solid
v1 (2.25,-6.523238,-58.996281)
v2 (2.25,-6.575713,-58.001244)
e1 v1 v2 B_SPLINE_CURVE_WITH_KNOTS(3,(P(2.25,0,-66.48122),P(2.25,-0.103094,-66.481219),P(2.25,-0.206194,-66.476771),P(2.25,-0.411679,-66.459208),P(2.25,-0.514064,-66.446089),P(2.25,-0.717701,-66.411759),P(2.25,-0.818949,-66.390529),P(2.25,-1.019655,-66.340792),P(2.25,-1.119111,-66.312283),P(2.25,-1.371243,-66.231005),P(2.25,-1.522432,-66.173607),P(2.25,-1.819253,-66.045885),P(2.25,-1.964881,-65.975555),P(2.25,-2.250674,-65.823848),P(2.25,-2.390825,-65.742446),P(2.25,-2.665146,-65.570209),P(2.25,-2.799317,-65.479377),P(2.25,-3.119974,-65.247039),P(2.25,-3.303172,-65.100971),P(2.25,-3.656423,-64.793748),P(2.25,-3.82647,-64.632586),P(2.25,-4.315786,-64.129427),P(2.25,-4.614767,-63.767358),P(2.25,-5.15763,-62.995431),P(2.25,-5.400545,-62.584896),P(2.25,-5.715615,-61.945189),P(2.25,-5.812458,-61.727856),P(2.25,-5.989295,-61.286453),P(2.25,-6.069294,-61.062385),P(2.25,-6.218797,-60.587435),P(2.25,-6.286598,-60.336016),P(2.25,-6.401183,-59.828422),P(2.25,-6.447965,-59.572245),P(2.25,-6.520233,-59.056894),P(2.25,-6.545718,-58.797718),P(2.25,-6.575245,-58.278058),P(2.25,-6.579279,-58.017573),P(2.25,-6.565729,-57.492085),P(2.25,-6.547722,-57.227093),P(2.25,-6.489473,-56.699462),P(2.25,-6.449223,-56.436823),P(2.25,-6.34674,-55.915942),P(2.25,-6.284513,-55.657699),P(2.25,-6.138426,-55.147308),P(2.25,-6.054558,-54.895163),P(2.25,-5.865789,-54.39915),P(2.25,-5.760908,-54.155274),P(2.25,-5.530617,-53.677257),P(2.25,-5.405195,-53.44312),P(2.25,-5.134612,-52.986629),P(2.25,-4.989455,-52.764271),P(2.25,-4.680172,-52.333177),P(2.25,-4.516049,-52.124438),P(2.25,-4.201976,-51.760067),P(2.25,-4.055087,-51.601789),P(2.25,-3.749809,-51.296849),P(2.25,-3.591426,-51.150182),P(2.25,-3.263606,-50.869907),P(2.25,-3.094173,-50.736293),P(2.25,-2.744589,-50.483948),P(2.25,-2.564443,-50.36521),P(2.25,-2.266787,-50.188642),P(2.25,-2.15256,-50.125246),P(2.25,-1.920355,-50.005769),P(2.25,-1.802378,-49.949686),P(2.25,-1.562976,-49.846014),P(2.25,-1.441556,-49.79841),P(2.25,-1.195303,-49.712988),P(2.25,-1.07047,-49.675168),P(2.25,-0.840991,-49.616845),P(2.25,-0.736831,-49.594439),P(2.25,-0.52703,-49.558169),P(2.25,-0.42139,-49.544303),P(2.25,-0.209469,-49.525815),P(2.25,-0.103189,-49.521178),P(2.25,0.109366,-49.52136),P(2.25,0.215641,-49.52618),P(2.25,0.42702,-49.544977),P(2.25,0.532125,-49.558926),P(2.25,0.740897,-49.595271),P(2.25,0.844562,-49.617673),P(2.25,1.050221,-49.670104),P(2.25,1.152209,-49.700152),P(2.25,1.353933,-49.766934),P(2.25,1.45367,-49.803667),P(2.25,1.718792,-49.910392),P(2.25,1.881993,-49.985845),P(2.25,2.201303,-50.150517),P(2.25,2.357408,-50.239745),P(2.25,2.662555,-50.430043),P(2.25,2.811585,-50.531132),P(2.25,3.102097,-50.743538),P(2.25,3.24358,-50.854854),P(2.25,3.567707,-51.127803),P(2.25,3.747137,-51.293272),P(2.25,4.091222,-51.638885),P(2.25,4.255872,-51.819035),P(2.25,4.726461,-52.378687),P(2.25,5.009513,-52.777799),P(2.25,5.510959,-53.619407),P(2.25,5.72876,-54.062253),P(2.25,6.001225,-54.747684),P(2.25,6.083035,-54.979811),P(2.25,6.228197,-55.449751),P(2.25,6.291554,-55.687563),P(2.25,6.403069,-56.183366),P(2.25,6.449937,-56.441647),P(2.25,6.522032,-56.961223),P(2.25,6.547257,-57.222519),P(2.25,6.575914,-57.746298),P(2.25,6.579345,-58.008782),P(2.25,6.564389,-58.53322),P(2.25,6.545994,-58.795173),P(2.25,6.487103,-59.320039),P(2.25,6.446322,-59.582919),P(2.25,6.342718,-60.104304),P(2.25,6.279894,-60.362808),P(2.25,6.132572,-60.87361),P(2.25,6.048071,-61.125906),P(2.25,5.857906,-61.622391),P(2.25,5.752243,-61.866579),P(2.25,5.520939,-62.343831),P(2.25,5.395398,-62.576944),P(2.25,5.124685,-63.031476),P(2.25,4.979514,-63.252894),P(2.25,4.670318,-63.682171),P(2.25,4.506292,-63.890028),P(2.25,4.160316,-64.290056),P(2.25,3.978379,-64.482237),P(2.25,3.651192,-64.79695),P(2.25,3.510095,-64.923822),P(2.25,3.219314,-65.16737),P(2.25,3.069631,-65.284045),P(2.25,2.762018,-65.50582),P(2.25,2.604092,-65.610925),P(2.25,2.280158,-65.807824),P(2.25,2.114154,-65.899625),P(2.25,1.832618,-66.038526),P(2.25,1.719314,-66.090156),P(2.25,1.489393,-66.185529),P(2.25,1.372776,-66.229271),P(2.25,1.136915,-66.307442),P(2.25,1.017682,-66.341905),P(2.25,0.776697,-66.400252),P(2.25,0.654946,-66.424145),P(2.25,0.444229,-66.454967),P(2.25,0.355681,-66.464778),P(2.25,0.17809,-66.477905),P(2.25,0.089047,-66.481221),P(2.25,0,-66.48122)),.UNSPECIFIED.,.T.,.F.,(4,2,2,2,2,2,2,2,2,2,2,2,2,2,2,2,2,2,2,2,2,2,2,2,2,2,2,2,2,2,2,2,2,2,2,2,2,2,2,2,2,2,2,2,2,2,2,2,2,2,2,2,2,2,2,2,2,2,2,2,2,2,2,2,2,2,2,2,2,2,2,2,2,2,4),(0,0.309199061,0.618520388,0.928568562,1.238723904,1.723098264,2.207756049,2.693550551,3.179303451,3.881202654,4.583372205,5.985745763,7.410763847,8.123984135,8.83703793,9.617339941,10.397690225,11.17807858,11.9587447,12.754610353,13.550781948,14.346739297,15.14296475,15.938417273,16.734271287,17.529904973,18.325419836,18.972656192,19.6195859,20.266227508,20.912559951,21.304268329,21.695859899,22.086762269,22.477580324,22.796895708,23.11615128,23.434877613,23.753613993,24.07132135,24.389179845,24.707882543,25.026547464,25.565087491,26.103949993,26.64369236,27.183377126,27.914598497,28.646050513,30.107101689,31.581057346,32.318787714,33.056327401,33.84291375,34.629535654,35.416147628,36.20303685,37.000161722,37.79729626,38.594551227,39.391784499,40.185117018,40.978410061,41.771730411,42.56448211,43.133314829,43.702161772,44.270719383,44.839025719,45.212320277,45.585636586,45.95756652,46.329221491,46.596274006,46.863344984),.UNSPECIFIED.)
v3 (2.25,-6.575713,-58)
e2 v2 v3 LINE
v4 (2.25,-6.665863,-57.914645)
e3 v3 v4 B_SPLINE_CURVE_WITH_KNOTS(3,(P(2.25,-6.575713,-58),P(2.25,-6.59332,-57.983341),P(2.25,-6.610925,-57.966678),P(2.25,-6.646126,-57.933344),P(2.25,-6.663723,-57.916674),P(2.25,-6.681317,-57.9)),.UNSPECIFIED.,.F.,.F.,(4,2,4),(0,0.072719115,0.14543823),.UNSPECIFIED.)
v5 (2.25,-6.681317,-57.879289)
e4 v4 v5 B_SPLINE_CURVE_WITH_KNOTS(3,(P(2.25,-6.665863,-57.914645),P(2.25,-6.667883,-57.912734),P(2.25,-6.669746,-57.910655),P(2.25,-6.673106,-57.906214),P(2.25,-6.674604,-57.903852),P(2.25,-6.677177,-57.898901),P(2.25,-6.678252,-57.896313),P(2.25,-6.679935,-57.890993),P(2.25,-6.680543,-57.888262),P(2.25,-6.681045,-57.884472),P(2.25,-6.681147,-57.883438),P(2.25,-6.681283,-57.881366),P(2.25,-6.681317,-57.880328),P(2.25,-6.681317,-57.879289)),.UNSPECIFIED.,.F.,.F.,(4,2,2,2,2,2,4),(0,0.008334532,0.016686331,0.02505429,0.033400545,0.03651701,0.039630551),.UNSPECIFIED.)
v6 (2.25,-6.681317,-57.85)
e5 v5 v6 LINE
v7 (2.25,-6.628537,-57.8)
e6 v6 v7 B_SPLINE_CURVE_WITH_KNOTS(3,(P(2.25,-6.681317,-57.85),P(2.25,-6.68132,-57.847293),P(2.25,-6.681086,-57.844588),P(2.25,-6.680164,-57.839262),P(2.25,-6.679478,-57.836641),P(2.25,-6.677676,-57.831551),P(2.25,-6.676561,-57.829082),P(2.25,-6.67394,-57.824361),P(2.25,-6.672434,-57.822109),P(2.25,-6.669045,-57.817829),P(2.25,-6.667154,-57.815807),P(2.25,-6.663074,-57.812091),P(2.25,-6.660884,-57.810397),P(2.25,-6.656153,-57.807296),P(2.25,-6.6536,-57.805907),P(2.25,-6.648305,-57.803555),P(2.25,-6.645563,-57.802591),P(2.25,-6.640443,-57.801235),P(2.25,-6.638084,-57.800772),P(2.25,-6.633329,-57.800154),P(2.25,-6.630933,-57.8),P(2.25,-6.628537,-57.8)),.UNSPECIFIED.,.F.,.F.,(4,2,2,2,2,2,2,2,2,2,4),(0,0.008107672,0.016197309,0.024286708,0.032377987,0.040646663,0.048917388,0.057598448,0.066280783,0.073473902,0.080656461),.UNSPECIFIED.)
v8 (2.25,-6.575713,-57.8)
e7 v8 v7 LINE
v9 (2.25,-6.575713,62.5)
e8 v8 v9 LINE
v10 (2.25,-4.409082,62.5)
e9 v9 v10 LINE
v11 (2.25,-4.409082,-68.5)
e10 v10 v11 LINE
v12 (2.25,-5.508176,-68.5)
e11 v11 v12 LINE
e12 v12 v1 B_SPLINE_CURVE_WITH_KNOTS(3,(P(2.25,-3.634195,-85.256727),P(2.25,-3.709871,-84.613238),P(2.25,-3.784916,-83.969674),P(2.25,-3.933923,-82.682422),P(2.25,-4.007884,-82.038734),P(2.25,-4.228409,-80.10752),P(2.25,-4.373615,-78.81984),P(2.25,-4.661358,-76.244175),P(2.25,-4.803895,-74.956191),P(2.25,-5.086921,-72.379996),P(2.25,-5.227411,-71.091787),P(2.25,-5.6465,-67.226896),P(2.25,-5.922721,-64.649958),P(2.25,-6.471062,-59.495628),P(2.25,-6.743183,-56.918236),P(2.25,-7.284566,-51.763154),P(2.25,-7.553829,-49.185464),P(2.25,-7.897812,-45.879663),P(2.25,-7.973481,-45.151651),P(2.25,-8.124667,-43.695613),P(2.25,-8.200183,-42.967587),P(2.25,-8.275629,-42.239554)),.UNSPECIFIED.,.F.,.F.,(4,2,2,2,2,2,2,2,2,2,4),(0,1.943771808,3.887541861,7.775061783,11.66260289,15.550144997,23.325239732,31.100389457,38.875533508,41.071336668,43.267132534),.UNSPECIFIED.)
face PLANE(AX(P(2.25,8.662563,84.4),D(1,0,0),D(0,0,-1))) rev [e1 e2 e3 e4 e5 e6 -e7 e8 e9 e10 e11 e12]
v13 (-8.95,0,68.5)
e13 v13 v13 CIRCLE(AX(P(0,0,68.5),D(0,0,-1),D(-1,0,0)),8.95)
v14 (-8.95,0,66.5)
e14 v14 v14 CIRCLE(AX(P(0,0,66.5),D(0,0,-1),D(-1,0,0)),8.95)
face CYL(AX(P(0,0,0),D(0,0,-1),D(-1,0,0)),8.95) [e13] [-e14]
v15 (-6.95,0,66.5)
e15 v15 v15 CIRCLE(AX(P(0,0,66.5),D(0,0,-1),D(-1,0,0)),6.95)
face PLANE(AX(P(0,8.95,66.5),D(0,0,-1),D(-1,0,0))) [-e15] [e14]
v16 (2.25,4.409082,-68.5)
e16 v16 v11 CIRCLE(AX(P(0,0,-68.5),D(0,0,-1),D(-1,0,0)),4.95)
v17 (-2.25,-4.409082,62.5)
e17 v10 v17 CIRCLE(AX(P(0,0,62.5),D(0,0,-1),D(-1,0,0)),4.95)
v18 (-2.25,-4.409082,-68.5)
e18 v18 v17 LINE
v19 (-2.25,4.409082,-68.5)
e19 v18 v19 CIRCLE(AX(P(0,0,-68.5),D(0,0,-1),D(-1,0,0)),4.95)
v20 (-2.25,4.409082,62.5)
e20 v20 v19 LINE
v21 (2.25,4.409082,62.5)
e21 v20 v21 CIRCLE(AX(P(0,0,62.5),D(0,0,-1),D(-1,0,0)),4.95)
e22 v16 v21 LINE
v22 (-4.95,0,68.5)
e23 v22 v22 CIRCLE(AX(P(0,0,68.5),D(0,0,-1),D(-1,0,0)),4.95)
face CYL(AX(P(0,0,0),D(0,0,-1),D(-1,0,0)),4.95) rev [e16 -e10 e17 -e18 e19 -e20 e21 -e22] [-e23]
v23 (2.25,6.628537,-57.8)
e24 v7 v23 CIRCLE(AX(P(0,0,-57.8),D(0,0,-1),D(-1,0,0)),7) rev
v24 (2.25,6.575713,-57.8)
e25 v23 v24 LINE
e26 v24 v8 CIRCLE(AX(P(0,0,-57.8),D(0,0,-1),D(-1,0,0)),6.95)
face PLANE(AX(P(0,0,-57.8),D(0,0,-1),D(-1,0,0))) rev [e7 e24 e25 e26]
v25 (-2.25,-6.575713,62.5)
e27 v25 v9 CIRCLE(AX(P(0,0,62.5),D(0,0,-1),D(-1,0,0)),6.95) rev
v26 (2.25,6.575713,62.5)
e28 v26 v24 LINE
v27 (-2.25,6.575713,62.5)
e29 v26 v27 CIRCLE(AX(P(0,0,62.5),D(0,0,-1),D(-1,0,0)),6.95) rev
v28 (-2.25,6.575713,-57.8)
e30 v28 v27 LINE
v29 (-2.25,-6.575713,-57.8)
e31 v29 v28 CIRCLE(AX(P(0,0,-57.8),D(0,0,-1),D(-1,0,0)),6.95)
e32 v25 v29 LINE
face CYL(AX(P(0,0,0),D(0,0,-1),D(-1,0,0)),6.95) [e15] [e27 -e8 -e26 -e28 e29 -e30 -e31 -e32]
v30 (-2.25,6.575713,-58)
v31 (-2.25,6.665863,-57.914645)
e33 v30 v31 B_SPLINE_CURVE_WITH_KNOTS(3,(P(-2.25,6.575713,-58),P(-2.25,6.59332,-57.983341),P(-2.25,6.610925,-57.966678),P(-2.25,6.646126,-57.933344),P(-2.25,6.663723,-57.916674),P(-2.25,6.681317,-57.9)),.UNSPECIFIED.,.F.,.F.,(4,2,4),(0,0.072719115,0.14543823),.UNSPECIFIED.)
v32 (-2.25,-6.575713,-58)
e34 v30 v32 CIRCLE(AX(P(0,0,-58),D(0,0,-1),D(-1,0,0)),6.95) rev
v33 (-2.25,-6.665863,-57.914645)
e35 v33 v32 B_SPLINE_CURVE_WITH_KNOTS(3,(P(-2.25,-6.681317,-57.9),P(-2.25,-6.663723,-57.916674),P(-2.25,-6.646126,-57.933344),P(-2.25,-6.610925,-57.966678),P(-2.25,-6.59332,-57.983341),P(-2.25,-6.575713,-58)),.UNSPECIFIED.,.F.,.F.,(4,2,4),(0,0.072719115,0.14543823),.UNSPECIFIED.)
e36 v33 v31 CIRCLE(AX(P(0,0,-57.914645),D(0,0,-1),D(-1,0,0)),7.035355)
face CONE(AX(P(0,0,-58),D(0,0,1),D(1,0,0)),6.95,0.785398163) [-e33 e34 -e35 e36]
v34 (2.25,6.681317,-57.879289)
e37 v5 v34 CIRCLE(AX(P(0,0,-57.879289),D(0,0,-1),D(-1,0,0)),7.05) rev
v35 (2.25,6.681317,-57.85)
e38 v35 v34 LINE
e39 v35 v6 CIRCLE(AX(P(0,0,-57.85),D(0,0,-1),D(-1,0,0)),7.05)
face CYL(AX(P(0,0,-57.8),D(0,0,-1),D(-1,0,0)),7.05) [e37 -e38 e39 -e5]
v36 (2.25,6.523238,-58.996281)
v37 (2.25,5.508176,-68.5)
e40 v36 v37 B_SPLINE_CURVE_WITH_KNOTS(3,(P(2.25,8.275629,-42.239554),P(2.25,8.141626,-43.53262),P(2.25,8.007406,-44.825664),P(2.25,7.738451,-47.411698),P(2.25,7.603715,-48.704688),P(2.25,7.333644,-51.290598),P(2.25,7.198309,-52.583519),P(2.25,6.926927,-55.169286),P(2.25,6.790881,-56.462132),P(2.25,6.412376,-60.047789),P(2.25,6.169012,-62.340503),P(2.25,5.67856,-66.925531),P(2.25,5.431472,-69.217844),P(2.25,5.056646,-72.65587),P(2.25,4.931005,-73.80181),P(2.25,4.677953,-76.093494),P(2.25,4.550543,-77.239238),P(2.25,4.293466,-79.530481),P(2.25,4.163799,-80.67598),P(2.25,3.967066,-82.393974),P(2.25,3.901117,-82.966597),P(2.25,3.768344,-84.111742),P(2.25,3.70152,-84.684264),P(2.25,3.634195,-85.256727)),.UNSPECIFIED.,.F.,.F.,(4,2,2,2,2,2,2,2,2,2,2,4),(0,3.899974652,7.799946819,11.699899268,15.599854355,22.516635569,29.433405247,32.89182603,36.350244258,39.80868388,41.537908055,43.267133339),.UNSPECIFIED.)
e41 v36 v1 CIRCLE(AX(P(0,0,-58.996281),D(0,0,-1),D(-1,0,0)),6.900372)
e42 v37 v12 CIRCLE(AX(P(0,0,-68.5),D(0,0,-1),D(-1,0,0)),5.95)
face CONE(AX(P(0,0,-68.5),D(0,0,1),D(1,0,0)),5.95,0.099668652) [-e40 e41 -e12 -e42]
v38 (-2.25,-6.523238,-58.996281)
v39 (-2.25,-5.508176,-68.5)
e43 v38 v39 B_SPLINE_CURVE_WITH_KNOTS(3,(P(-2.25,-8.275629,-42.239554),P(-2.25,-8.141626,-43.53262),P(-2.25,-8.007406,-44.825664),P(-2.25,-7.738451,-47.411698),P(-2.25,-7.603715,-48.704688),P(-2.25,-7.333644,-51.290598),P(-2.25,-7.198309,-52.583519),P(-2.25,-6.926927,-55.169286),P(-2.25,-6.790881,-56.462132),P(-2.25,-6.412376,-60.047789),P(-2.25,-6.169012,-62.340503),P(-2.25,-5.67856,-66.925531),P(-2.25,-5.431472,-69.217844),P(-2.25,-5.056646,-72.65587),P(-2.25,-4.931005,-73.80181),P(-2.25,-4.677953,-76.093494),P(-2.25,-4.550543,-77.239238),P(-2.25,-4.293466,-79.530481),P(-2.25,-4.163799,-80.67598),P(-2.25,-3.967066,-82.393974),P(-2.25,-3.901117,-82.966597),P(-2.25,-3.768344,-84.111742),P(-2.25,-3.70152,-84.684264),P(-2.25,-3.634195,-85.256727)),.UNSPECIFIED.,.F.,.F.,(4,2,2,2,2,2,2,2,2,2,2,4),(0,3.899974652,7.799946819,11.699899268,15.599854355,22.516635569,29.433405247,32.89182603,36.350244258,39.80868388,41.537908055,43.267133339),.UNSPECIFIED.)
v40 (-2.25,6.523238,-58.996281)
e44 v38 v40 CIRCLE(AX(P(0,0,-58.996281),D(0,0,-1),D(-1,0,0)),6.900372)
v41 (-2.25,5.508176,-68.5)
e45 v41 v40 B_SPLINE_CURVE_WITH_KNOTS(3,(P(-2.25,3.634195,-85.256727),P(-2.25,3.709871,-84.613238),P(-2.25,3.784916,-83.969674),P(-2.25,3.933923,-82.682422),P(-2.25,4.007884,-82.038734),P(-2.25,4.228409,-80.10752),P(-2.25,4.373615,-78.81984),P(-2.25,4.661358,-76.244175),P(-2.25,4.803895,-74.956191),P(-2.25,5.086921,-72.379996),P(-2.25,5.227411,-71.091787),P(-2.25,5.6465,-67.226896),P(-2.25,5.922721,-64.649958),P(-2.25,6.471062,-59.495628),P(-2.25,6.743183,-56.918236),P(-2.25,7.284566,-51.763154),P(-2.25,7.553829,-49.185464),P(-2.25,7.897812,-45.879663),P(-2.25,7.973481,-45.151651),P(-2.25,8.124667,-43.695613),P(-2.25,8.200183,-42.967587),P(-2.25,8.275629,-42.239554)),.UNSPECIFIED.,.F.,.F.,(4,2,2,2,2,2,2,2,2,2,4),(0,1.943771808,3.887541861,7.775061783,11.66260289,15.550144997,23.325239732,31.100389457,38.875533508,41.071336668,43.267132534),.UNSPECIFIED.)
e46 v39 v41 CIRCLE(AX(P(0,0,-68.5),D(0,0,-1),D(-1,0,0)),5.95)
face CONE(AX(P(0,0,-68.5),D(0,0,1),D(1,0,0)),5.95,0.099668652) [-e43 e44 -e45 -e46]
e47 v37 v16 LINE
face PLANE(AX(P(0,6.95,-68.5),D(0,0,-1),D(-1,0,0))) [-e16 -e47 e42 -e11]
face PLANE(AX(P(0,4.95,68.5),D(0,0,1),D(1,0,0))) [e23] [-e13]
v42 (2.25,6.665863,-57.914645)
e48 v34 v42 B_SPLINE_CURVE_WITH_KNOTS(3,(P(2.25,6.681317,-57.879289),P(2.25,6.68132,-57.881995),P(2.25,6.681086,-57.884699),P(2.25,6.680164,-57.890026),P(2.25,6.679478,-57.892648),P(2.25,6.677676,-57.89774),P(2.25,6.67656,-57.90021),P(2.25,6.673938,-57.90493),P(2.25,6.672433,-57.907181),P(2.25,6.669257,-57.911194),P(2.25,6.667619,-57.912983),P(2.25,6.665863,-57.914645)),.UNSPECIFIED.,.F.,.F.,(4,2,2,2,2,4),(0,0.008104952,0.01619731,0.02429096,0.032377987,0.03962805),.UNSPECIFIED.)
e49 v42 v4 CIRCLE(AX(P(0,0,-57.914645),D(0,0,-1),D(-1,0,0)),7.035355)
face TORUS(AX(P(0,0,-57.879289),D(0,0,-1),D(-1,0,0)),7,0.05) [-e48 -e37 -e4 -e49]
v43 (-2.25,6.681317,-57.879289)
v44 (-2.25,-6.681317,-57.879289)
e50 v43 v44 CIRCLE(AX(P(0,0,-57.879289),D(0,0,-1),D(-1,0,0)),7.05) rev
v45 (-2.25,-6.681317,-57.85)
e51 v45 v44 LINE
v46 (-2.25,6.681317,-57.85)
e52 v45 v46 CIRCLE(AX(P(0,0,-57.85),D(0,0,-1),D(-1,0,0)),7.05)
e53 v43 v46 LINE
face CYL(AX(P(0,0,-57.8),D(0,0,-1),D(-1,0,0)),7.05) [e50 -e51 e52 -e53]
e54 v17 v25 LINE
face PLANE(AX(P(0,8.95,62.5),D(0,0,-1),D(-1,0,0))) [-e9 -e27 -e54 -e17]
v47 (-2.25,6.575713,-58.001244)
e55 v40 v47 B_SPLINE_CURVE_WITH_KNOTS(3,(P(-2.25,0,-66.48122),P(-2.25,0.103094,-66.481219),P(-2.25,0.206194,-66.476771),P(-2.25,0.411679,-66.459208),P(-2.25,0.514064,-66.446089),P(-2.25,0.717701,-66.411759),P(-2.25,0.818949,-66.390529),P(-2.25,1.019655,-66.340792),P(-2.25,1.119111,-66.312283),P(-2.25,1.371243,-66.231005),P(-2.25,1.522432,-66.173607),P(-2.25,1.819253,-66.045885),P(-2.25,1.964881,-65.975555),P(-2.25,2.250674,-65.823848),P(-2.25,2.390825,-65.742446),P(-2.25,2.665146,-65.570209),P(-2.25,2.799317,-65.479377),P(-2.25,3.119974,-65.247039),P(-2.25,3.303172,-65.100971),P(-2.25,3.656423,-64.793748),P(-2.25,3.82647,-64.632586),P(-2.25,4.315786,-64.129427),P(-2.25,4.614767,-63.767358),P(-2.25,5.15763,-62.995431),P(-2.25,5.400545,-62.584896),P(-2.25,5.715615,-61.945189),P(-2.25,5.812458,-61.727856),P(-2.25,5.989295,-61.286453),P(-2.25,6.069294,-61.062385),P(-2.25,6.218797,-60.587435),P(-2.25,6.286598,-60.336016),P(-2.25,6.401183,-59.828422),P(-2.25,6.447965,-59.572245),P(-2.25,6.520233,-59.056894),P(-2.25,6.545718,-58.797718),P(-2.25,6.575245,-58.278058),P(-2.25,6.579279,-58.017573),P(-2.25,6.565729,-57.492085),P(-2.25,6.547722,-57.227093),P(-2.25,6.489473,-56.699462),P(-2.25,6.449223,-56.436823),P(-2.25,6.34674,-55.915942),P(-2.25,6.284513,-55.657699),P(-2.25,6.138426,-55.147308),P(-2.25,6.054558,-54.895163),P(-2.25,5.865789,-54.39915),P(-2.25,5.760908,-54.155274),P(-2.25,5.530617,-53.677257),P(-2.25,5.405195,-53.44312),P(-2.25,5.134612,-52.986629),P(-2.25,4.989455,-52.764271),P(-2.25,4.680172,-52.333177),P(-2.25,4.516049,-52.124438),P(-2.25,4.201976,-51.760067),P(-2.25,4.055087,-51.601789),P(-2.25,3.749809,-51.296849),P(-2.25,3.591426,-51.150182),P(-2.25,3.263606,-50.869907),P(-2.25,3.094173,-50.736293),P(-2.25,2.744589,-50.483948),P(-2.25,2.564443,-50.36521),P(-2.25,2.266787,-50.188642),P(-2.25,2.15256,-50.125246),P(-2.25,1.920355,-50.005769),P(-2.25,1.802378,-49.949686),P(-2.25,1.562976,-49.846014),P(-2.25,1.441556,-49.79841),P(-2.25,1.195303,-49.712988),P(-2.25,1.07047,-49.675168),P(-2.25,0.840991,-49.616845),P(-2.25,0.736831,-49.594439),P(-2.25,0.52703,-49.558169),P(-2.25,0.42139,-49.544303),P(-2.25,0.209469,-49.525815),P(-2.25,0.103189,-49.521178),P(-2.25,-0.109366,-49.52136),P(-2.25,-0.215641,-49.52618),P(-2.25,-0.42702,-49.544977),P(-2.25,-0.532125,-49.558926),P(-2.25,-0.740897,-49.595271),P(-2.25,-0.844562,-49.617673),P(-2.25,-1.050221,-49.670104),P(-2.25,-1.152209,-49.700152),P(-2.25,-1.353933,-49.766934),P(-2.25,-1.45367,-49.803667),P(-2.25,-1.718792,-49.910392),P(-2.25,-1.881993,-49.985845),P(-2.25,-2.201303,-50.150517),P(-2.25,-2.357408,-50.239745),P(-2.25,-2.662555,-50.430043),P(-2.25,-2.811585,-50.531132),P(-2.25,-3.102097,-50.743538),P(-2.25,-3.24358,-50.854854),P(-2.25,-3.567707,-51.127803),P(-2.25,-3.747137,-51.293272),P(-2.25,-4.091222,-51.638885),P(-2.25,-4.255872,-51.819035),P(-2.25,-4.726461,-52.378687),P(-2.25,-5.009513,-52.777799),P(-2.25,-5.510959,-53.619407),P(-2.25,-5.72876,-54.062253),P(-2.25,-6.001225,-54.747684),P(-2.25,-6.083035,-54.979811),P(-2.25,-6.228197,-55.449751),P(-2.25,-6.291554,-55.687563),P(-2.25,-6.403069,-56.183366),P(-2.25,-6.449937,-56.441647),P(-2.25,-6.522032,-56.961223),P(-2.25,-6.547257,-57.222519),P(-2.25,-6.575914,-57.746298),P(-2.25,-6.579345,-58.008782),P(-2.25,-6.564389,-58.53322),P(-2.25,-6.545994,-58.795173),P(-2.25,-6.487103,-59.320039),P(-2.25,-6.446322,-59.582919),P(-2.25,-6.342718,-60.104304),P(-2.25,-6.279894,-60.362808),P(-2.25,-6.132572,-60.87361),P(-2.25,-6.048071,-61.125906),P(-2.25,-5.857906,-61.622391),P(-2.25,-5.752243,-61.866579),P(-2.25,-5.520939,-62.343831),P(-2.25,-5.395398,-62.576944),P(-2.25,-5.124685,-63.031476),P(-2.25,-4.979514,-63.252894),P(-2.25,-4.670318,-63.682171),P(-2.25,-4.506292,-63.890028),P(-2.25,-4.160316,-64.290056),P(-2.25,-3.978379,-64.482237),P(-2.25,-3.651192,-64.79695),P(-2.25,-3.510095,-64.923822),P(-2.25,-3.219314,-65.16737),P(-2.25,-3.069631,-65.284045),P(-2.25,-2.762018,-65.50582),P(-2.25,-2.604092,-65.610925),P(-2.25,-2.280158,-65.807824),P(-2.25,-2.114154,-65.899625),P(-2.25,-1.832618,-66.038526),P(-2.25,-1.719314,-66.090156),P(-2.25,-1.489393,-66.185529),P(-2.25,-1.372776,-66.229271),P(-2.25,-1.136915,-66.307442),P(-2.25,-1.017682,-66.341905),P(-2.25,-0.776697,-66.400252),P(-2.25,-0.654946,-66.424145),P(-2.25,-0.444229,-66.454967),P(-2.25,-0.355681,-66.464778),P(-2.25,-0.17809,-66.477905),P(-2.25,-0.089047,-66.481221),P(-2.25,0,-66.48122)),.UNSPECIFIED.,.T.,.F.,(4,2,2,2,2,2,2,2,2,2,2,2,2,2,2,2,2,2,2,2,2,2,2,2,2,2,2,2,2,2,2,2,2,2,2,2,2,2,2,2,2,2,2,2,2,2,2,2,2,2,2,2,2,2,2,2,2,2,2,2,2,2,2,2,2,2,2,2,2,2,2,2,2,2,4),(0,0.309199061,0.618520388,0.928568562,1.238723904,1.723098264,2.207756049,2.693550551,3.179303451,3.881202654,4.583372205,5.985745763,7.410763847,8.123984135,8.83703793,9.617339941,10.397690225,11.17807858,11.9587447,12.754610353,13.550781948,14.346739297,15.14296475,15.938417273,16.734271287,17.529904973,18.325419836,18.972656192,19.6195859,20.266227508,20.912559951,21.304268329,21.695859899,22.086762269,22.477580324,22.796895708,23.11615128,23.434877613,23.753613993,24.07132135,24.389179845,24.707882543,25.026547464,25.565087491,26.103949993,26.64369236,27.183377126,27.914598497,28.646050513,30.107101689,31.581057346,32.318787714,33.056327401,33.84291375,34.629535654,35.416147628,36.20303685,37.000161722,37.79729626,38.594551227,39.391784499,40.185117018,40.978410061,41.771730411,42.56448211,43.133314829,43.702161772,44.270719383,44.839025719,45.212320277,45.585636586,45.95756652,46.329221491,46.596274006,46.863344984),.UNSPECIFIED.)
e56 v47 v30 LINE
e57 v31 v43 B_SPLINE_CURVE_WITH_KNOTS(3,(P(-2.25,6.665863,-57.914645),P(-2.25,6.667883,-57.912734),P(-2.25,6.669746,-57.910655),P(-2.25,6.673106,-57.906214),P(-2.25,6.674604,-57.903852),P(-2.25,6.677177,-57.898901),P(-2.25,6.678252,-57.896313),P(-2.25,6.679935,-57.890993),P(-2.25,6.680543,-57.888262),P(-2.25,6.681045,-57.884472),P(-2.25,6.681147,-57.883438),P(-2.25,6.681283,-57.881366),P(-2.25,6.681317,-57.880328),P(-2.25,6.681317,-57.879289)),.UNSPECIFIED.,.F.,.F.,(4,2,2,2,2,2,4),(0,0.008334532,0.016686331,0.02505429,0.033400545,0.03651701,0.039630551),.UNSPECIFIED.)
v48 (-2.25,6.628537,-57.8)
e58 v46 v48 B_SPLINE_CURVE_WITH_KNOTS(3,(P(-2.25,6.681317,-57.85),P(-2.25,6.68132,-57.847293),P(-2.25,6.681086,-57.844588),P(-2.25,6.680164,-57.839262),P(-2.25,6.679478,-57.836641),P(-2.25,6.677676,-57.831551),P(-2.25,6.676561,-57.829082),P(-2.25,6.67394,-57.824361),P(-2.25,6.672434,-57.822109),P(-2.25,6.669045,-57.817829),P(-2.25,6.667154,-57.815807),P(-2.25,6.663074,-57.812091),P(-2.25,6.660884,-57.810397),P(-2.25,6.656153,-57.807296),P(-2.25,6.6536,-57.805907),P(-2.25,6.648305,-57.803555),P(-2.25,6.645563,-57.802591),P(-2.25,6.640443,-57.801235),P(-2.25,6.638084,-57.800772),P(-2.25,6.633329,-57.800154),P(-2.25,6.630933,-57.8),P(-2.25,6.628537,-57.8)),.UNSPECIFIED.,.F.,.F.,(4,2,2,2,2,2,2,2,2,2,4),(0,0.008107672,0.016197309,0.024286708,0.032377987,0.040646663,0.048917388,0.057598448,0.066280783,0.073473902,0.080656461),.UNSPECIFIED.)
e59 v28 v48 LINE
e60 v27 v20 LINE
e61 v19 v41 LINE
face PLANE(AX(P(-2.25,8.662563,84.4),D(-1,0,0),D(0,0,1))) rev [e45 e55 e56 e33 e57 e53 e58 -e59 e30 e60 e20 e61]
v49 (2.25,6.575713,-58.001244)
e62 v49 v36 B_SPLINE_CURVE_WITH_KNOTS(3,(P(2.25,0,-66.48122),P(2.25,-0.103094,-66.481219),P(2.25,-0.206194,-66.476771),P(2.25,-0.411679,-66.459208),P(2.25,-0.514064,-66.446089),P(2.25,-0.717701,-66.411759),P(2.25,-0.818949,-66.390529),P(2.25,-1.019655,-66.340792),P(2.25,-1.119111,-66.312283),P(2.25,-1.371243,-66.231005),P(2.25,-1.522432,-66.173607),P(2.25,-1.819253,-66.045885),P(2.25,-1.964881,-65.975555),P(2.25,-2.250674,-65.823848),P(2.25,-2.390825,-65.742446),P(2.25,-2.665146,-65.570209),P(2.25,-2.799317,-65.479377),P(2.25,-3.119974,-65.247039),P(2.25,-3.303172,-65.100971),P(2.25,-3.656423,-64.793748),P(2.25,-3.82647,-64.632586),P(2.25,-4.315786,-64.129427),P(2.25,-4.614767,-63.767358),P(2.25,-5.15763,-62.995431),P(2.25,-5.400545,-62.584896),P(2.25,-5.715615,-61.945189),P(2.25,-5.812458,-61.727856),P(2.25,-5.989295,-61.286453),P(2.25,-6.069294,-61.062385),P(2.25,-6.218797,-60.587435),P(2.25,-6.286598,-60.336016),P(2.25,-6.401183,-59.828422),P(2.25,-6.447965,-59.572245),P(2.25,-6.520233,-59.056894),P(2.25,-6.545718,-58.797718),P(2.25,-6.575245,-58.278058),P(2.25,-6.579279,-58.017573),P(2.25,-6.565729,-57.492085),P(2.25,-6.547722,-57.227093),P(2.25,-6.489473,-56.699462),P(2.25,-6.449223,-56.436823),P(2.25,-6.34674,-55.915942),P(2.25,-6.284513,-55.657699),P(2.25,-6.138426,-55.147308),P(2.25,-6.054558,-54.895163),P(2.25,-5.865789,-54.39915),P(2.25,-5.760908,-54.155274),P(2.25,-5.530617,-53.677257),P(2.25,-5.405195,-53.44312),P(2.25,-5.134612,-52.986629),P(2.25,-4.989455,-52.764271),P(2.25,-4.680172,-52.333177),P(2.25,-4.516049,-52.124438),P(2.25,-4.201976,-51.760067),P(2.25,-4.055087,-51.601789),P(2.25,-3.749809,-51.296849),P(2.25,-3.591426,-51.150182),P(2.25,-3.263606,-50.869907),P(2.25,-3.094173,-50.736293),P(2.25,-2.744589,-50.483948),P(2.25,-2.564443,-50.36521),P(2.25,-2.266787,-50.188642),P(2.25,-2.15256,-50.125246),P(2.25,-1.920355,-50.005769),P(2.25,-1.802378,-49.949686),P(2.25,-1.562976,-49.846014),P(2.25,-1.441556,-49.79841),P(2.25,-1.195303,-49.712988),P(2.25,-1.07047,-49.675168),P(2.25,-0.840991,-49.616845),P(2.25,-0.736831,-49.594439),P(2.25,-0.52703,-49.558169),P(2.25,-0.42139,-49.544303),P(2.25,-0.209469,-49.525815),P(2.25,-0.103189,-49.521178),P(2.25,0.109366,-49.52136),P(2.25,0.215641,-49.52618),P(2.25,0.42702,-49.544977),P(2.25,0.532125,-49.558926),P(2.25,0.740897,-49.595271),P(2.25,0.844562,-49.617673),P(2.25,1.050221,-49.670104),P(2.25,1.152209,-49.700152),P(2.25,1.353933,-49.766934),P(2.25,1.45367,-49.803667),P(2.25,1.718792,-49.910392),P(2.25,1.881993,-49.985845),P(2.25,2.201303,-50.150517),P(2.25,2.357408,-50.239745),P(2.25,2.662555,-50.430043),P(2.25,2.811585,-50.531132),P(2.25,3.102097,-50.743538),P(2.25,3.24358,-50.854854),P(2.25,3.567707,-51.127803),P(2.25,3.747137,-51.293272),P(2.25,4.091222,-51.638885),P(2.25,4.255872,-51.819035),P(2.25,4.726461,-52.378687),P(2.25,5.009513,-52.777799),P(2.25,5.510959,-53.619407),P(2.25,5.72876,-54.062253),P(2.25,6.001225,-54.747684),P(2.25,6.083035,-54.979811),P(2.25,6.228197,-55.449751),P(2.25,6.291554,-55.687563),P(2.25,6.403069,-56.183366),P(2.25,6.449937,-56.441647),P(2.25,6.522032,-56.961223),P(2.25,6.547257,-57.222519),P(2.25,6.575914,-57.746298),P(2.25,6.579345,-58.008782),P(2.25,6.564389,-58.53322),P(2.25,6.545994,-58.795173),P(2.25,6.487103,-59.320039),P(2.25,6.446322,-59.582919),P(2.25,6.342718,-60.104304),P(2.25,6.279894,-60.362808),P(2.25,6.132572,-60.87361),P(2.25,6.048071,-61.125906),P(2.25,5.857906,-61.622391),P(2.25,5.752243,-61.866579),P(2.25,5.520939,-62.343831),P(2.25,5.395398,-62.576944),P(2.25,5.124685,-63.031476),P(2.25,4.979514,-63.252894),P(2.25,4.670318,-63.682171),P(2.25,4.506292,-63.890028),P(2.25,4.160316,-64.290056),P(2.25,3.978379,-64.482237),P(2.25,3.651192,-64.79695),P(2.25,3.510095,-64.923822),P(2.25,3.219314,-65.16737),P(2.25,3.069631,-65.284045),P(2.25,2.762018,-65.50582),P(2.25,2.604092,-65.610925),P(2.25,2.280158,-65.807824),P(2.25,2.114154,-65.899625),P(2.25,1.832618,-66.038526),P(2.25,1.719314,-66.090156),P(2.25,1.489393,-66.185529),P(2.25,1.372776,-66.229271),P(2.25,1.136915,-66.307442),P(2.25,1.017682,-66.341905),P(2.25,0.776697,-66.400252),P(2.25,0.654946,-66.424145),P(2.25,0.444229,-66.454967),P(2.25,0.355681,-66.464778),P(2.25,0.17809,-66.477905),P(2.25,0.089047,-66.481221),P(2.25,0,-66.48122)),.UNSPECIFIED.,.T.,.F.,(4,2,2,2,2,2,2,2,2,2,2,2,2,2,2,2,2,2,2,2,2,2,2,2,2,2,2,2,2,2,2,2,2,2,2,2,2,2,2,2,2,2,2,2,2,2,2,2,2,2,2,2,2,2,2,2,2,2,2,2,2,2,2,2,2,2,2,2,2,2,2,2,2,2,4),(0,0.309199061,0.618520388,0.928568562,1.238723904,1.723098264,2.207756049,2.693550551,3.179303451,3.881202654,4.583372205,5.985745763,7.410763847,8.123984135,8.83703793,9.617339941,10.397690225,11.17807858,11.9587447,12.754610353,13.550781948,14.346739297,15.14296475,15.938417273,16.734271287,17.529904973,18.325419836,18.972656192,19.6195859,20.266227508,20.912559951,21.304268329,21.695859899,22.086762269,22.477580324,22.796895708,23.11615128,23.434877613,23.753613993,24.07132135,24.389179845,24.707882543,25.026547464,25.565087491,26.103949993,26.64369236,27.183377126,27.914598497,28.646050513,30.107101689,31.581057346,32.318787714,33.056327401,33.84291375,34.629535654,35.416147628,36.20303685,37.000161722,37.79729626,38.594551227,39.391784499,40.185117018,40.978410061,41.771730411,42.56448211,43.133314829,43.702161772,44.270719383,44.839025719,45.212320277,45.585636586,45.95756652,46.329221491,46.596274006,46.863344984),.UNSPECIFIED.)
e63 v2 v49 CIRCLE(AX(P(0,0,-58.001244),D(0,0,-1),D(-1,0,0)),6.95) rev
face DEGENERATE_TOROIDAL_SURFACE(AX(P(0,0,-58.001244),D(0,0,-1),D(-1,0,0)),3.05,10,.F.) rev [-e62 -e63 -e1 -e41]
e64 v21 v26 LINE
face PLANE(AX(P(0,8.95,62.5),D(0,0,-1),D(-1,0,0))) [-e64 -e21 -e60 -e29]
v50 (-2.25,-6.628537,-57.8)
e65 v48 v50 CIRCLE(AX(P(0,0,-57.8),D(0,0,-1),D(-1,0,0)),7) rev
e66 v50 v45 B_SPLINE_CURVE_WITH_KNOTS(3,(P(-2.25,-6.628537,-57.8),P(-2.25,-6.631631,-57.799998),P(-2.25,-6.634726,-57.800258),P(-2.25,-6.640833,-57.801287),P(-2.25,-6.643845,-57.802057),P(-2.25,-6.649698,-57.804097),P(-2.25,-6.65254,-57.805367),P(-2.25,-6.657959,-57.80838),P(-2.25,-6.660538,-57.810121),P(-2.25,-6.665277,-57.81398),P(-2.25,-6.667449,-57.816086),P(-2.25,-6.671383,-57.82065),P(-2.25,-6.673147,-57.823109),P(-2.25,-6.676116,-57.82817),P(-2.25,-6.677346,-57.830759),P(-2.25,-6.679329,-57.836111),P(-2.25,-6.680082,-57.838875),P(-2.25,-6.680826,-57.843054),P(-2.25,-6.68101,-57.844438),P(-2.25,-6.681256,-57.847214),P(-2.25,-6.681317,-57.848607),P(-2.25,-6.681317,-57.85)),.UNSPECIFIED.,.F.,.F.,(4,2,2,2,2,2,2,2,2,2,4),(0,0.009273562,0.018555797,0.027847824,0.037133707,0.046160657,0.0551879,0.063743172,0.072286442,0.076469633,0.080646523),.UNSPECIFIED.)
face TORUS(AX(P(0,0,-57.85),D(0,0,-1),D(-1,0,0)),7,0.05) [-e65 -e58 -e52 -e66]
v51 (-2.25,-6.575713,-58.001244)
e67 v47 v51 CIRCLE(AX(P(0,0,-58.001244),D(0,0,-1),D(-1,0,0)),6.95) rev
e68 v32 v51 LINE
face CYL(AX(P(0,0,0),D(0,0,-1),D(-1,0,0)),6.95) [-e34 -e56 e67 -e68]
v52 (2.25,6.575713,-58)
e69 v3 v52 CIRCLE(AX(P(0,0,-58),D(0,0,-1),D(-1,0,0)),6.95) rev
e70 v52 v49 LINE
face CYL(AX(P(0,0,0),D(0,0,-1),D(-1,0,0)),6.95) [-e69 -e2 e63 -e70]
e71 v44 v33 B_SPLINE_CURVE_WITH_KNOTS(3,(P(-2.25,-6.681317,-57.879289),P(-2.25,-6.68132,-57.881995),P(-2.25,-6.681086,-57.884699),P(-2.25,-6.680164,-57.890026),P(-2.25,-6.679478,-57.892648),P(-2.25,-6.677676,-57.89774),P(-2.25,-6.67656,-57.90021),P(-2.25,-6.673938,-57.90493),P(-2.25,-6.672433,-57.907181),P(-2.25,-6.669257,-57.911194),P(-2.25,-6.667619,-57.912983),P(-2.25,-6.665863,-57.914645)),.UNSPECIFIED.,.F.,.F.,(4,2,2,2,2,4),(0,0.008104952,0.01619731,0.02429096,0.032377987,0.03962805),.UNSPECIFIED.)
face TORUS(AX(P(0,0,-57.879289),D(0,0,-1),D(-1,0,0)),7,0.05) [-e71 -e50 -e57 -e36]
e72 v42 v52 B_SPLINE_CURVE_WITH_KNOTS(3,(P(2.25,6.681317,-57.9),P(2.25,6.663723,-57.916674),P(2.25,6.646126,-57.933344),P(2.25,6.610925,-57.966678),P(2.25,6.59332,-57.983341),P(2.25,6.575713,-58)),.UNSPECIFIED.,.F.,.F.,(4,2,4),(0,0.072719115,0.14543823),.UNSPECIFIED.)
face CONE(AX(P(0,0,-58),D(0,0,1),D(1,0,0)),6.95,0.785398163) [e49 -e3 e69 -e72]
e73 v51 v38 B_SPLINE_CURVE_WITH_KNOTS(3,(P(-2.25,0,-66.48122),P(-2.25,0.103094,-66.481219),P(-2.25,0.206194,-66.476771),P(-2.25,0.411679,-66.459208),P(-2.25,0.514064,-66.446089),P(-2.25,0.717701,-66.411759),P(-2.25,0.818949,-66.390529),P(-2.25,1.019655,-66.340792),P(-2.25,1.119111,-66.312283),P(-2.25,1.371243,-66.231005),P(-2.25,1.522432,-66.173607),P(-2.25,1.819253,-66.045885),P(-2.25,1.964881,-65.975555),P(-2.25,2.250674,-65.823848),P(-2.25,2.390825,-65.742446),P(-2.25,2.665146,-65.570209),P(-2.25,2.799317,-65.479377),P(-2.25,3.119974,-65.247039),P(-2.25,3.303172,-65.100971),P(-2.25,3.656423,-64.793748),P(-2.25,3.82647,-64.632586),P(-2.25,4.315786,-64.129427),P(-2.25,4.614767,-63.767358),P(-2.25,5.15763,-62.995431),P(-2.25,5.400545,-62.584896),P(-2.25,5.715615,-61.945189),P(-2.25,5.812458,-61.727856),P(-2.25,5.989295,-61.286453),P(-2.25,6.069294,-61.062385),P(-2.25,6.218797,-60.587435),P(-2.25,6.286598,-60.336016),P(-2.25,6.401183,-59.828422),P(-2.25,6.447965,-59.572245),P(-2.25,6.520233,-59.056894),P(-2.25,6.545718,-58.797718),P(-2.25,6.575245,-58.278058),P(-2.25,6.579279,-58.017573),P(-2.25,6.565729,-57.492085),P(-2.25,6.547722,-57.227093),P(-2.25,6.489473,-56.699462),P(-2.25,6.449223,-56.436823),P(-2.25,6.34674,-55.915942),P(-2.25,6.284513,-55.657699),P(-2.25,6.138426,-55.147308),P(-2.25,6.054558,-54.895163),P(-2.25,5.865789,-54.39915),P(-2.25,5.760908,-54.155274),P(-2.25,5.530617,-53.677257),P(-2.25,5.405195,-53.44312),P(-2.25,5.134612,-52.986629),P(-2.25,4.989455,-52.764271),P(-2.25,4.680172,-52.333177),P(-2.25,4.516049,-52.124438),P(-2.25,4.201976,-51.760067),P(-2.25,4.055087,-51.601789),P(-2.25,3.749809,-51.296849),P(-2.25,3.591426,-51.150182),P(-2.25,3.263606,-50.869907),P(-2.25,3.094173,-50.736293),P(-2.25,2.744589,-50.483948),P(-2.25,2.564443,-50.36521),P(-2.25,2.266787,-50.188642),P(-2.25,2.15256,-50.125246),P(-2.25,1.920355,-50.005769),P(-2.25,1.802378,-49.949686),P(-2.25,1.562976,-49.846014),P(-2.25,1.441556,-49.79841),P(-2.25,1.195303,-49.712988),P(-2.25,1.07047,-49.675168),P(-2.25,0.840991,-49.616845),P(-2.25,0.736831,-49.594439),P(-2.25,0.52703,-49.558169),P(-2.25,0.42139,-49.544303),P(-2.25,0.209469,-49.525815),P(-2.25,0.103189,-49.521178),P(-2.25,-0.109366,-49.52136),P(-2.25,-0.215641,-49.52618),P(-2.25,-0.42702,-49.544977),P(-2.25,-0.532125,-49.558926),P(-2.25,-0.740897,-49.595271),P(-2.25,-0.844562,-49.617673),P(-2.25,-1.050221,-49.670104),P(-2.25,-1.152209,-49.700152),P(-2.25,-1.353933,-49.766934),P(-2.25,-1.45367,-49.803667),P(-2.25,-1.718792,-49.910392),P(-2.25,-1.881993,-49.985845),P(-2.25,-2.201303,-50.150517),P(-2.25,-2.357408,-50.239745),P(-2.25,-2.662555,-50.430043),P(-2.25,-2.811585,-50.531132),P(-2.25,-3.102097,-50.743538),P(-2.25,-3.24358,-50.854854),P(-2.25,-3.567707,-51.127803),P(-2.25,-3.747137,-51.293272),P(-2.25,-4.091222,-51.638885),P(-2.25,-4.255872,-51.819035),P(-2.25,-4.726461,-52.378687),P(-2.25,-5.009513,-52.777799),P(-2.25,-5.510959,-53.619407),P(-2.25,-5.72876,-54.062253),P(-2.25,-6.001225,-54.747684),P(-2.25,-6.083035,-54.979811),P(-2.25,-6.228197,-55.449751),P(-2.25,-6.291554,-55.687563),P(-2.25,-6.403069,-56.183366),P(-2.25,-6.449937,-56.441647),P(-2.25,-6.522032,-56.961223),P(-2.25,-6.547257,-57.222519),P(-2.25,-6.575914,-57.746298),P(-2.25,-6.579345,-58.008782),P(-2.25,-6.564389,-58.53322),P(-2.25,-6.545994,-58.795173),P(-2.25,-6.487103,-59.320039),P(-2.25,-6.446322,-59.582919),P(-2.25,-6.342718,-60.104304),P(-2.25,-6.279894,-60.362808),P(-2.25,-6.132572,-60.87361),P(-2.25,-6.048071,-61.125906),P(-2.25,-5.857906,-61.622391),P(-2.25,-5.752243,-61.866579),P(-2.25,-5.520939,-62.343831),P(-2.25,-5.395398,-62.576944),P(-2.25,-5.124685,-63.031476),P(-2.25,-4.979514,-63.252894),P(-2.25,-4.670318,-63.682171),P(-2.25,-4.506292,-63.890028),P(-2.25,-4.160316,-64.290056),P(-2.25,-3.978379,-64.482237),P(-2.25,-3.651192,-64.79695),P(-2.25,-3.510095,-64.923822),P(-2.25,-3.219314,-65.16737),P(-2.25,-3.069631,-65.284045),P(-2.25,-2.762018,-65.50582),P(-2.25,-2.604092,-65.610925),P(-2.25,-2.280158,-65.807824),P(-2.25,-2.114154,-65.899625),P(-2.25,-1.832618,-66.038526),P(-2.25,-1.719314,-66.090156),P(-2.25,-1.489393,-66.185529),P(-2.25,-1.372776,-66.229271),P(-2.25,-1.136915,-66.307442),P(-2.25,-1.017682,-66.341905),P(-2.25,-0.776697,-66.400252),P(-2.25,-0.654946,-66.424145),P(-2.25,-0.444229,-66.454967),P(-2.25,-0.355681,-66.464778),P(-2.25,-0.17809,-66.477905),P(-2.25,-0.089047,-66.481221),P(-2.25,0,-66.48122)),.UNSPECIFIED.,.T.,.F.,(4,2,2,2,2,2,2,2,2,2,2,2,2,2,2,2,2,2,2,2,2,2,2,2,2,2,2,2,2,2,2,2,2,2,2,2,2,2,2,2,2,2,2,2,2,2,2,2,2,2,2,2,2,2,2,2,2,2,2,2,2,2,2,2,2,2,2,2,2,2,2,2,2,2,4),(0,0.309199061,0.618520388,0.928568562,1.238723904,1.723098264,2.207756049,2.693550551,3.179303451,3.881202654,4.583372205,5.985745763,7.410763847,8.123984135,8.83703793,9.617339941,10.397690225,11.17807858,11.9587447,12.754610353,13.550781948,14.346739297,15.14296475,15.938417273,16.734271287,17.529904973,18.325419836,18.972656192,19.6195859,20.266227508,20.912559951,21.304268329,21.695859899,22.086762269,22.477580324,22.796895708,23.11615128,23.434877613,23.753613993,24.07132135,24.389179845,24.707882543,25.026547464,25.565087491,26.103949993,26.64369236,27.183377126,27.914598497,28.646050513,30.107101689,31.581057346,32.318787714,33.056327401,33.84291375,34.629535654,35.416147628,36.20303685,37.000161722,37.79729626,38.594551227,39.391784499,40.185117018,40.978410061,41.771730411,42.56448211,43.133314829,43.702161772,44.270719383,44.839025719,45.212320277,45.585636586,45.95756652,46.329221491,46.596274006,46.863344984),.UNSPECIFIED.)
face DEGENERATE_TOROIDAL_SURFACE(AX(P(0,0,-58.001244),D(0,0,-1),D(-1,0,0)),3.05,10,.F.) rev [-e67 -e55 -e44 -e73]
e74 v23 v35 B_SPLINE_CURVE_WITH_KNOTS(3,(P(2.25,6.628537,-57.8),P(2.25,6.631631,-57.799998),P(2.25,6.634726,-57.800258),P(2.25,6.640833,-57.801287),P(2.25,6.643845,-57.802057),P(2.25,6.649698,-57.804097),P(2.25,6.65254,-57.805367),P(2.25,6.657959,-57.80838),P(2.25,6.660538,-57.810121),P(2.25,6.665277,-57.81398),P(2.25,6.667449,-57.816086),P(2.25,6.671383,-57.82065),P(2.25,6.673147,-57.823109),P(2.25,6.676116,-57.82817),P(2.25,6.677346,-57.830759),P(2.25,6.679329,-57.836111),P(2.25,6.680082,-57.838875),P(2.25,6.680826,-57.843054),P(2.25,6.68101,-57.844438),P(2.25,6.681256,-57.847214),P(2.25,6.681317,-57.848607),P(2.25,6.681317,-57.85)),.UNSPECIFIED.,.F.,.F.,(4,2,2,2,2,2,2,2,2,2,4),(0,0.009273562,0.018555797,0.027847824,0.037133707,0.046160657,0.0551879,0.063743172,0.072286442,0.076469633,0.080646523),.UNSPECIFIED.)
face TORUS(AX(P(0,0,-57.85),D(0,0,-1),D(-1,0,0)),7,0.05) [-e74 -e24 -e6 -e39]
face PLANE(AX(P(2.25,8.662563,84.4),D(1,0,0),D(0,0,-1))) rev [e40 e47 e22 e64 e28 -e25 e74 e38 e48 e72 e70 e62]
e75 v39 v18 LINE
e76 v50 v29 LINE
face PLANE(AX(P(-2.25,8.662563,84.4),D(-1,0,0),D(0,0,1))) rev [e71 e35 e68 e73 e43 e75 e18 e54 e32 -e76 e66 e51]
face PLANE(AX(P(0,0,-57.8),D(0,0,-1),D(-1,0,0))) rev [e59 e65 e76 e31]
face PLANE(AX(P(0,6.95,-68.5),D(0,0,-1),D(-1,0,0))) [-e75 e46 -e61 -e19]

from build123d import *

# Parameters (mm, degrees)
CHAFL_N2_SIZE           = 10
CHAFL_N2_SIZE2          = 1
REDONDEO1_R             = 10
SALIENTE_EXTRUIR1_START = -10.5
CROQUIS3_R              = 7.05
CROQUIS3_R_2            = 6.95
SALIENTE_EXTRUIR1_DEPTH = 0.2
CROQUIS2_W              = 4.5
CROQUIS2_H              = 17.325126262
CORTAR_EXTRUIR1_DEPTH   = 131
CHAFL_N3_SIZE           = 0.1
REDONDEO2_R             = 0.05


# Some blends are built 0.0001 mm under size
with BuildPart() as part:
    # Croquis1 → Revolución1 (revolve)
    with BuildSketch(Plane.YZ, mode=Mode.PRIVATE) as revoluci_n1_sk:
        Polygon((4.95, -68.5), (4.95, 68.5), (8.95, 68.5), (8.95, 66.5), (6.95, 66.5), (6.95, -68.5), align=None)
    revolve(revoluci_n1_sk.sketch.rotate(Axis((0, 0, 0), (0, 0, 1)), 90), axis=Axis((0, 0, 0), (0, 0, 1)))

    # Chaflán2
    chafl_n2_edges = [part.edges().sort_by_distance(p)[0] for p in [
        (6.95, 0, -68.5),
    ]]
    chafl_n2_side = [part.faces().sort_by_distance(p)[0] for p in [
        (6.95, 0, -1),
    ]]
    chamfer(chafl_n2_edges, length=CHAFL_N2_SIZE, length2=CHAFL_N2_SIZE2, reference=chafl_n2_side[0])

    # Redondeo1
    # the kernel refuses this fillet: 10 mm, written as the material it takes off along each edge
    with BuildSketch(Plane(origin=(0, 0, -58.5), x_dir=(-1, 0, 0), z_dir=(0, 1, 0))) as redondeo1_piece_1:
        with BuildLine():
            CenterArc((6.95 - REDONDEO1_R, REDONDEO1_R * 0.0498756211209), REDONDEO1_R, 354.289406863, 5.710593137)
            Line((6.95 - REDONDEO1_R * 0.00496280979001, -REDONDEO1_R * 0.0496280979001), (6.95, 0))
            Line((6.95, 0), (6.95, REDONDEO1_R * 0.0498756211209))
        make_face()
    revolve(axis=Axis((0, 0, -58.5), (0, 0, 1)), mode=Mode.SUBTRACT)

    # Croquis3 → Saliente-Extruir1 (add)
    with BuildSketch(Plane(origin=(0, 0, -68.5), x_dir=(1, 0, 0), z_dir=(0, 0, -1)).offset(SALIENTE_EXTRUIR1_START)):
        with Locations(Location((0, 0, 0), (0, 0, 180))):
            Circle(CROQUIS3_R)
        with Locations(Location((0, 0, 0), (0, 0, 180))):
            Circle(CROQUIS3_R_2, mode=Mode.SUBTRACT)
    extrude(amount=-SALIENTE_EXTRUIR1_DEPTH)

    # Croquis2 → Cortar-Extruir1 (cut)
    with BuildSketch(Plane(origin=(0, 0, -68.5), x_dir=(1, 0, 0), z_dir=(0, 0, -1))):
        Rectangle(CROQUIS2_W, CROQUIS2_H)
    extrude(amount=-CORTAR_EXTRUIR1_DEPTH, mode=Mode.SUBTRACT)

    # Chaflán3
    chafl_n3_edges = [part.edges().sort_by_distance(p)[0] for p in [
        (7.05, 0, -58),
        (-7.05, 0, -58),
    ]]
    chamfer(chafl_n3_edges, length=CHAFL_N3_SIZE - 0.0001)  # a hair under: the kernel refuses the full size

    # Redondeo2
    redondeo2_edges = [part.edges().sort_by_distance(p)[0] for p in [
        (7.05, 0, -57.8),
        (7.05, 0, -57.9001),
        (-7.05, 0, -57.9001),
        (-7.05, 0, -57.8),
    ]]
    fillet(redondeo2_edges, radius=REDONDEO2_R)


solid = part.part
